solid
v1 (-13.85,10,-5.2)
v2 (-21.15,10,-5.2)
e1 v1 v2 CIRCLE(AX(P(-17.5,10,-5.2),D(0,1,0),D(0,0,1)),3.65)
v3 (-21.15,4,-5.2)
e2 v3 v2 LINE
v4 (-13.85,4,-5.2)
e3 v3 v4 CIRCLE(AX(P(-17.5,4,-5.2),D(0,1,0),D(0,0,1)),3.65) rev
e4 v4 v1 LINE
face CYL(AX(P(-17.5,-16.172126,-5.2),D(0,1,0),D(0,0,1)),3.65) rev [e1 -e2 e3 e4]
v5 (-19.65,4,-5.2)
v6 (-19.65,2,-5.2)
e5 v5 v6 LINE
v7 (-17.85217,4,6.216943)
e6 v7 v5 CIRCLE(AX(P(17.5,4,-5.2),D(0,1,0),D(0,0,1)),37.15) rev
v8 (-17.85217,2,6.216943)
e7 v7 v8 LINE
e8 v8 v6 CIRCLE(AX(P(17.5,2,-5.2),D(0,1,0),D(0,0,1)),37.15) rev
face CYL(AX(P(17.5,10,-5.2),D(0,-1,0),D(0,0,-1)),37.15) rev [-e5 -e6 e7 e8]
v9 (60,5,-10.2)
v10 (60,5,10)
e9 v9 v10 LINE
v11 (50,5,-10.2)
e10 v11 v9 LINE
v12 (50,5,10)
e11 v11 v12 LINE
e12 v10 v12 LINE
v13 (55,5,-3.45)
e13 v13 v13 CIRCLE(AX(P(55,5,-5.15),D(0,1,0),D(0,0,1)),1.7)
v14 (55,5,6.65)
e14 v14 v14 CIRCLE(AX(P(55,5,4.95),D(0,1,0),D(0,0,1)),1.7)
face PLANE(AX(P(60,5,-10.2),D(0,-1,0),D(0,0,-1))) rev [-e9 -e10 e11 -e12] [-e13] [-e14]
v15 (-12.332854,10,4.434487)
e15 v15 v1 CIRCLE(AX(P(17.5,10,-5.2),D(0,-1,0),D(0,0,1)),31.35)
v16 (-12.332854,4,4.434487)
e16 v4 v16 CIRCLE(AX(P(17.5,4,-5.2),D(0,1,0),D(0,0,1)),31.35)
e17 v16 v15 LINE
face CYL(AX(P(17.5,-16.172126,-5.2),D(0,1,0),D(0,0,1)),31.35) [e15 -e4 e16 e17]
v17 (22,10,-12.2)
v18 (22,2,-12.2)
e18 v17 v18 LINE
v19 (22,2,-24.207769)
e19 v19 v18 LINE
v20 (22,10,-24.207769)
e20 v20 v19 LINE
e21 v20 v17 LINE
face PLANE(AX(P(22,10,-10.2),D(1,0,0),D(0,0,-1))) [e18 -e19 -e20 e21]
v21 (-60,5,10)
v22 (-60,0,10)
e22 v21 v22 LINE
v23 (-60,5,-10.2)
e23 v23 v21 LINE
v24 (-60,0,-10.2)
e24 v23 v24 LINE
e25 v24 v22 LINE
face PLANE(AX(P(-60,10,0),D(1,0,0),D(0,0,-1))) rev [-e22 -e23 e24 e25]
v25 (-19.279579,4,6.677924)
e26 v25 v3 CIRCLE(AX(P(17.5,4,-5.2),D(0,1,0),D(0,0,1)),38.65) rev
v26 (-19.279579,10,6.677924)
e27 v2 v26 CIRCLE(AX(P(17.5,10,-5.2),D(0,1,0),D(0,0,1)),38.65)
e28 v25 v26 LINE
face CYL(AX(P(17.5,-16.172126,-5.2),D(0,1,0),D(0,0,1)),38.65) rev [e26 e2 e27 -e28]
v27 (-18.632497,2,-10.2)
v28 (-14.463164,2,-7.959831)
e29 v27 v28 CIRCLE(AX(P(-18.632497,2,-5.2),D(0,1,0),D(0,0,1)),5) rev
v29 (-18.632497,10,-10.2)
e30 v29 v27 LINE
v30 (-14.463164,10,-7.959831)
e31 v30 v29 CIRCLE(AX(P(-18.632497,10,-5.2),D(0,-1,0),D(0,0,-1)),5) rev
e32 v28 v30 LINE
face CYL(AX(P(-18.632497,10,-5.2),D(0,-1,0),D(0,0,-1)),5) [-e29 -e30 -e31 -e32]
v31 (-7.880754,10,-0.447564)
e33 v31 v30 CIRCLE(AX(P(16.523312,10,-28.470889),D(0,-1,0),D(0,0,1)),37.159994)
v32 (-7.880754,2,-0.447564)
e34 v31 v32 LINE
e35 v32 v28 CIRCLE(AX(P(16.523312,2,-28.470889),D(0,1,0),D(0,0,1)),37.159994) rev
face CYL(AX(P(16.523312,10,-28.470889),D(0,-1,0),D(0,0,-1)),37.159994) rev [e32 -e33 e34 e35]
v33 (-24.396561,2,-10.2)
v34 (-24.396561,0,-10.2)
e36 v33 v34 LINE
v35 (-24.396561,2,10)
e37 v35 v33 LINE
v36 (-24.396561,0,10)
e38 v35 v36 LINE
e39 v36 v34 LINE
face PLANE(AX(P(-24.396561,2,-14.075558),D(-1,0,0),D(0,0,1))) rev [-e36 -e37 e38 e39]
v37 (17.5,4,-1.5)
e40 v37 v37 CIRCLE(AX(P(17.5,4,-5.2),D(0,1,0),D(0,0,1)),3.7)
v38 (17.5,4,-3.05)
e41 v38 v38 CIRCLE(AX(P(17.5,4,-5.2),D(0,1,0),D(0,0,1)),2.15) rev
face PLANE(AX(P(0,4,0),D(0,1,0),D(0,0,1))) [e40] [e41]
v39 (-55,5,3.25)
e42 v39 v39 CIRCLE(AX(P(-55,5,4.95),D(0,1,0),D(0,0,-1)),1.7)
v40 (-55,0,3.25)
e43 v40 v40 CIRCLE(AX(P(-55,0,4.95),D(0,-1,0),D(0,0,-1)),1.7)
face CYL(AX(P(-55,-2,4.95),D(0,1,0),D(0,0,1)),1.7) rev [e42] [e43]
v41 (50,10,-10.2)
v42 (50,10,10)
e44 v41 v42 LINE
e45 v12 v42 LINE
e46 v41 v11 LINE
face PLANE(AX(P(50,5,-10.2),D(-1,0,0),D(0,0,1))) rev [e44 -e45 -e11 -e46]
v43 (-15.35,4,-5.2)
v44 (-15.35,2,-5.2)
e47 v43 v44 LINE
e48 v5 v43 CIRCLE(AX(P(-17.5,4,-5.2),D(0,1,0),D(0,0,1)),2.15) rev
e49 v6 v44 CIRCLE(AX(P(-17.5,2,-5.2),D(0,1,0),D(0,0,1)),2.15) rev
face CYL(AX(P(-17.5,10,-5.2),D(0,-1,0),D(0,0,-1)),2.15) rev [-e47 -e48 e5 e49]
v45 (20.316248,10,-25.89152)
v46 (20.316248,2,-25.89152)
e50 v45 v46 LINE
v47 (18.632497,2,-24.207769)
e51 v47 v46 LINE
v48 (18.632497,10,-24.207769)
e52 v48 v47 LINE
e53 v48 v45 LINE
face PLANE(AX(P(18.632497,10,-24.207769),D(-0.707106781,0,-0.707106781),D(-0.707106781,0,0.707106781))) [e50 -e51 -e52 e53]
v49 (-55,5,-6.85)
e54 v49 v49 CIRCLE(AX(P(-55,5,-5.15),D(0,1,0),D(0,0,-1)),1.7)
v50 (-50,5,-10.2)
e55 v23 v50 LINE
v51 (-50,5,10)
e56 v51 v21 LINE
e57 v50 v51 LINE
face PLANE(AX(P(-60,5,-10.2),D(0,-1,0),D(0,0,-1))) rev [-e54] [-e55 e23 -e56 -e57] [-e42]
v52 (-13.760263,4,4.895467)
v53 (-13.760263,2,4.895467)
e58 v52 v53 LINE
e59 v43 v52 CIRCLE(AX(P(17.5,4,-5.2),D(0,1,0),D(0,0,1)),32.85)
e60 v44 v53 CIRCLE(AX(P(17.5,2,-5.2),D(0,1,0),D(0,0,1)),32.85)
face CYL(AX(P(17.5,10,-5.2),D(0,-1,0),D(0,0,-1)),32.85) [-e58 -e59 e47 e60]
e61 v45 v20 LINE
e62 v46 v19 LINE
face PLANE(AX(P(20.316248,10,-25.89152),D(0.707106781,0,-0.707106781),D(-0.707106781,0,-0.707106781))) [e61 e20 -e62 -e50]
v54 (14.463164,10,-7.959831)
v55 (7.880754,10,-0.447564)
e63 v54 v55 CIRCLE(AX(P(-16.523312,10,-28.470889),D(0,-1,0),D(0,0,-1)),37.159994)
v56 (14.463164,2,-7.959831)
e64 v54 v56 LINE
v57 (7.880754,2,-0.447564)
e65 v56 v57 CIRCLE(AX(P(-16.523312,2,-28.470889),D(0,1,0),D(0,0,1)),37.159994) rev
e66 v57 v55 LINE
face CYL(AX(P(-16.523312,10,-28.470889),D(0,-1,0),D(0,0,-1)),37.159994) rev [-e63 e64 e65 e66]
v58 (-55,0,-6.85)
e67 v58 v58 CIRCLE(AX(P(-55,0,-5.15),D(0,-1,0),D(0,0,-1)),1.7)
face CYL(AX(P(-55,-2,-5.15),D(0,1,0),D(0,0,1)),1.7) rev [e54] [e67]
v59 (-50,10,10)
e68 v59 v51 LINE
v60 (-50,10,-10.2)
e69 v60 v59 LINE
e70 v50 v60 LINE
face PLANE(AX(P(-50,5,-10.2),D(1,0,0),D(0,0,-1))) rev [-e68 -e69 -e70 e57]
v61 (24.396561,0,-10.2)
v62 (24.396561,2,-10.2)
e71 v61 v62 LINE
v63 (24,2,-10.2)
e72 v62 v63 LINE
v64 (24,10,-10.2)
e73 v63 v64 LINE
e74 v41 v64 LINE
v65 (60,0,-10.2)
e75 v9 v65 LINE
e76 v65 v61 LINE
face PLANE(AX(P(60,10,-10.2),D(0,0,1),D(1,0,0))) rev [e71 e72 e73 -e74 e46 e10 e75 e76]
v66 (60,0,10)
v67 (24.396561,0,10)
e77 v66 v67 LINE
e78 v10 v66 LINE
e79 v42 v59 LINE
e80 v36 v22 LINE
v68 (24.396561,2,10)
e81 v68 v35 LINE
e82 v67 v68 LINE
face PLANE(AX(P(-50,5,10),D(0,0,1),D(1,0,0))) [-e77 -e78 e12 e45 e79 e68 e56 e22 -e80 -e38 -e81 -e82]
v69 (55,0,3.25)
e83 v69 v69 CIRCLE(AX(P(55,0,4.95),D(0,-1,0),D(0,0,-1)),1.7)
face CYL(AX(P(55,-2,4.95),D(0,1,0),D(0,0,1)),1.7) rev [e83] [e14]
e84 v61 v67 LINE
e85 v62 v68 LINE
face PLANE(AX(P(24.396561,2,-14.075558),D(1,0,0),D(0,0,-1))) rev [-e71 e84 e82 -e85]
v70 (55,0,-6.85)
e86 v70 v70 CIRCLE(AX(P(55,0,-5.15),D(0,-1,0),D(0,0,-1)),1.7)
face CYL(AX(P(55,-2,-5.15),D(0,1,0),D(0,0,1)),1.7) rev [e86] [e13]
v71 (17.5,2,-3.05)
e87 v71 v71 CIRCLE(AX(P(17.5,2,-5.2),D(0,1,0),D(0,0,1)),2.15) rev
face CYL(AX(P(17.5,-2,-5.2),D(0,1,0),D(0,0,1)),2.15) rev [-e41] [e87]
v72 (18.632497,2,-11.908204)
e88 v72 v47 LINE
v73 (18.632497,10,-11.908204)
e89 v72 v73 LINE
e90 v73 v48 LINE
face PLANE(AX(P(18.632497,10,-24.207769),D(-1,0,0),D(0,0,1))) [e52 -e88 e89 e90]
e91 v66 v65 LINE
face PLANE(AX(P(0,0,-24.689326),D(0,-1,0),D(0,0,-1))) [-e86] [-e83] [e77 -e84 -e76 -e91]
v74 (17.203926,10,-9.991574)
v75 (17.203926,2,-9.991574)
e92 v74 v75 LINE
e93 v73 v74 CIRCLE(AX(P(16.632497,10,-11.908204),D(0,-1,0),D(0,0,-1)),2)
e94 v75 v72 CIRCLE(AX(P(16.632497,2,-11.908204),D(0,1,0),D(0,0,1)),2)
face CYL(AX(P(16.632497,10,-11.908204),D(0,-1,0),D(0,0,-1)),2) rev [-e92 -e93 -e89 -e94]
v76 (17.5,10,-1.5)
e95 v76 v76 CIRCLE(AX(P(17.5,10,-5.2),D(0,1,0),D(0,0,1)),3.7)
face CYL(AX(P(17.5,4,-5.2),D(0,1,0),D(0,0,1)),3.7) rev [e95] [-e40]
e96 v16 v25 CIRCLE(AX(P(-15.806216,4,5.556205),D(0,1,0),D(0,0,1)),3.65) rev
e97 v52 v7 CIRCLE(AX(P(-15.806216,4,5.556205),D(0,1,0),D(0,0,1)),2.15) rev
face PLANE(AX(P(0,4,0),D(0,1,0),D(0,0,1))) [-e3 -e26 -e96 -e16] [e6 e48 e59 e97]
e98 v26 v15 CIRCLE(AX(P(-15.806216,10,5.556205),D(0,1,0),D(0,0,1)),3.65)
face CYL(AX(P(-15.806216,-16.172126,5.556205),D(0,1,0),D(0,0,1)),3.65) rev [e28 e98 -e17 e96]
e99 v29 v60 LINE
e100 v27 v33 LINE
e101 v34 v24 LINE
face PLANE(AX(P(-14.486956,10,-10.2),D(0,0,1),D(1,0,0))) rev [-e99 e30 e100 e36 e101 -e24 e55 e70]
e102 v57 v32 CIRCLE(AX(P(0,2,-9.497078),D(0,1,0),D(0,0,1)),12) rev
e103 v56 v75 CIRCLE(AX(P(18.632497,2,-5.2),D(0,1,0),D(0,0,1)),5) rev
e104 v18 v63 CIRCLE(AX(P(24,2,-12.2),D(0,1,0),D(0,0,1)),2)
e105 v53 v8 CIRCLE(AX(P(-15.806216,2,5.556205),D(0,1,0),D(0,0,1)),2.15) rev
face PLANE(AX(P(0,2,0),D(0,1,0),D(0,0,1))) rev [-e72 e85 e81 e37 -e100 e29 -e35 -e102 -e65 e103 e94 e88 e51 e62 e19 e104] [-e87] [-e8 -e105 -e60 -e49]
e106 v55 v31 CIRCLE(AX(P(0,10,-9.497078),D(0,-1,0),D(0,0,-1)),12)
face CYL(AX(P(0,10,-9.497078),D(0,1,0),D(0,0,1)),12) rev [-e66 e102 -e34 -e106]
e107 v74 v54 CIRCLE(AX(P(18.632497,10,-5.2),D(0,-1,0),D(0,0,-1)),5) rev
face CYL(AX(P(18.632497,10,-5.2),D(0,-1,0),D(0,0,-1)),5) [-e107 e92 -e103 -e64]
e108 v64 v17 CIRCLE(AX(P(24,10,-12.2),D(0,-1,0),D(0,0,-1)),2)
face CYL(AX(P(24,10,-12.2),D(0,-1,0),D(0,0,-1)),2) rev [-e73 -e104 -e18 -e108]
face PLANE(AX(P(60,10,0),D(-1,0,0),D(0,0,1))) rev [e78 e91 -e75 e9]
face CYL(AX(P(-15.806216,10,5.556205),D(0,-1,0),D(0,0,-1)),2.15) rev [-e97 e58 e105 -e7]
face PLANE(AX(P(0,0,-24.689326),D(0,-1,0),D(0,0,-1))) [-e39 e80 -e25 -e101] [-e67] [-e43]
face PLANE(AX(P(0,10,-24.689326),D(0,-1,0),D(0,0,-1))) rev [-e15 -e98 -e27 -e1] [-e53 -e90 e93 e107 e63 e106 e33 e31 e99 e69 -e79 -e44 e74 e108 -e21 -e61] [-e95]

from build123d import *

# Parameters (mm, degrees)
AUFSATZ_LINEAR_AUSTRAGEN1_DEPTH  = 10
AUFSATZ_LINEAR_START             = 2
AUFSATZ_LINEAR_AUSTRAGEN2_DEPTH  = 2
SKIZZE3_R                        = 2.15
SCHNITT_LINEAR_AUSTRAGEN1_DEPTH  = 63.032572089
SKIZZE5_R                        = 3.7
SKIZZE5_R_2                      = 2.15
SCHNITT_LINEAR_AUSTRAGEN3_DEPTH  = 6
VERRUNDUNG3_START                = -11
VERRUNDUNG3_DEPTH                = 12
VERRUNDUNG3_START_2              = -10.2
VERRUNDUNG3_2_DEPTH              = 10.2
SKIZZE9_W                        = 10
SKIZZE9_H                        = 5
SCHNITT_LINEAR_AUSTRAGEN6_DEPTH  = 62.676900052
SKIZZE10_W                       = 10
SKIZZE10_H                       = 10
AUFSATZ_LINEAR_AUSTRAGEN3_DEPTH  = 5
AUFSATZ_LINEAR_AUSTRAGEN4_DEPTH  = 10
SKIZZE12_R                       = 1.7
SCHNITT_LINEAR_AUSTRAGEN7_DEPTH  = 62.262060037
SCHNITT_LINEAR_AUSTRAGEN8_DEPTH  = 63.032572089
SCHNITT_LINEAR_AUSTRAGEN10_DEPTH = 63.032572089
VERRUNDUNG6_R                    = 5
VERRUNDUNG7_R                    = 12
SCHNITT_LINEAR_AUSTRAGEN11_DEPTH = 6
SKIZZE19_W                       = 48.79312263
SKIZZE19_H                       = 28.151116142
SCHNITT_LINEAR_AUSTRAGEN12_DEPTH = 4
AUFSATZ_LINEAR_AUSTRAGEN6_DEPTH  = 8
VERRUNDUNG8_R                    = 2


with BuildPart() as part:
    # Skizze1 → Aufsatz-Linear austragen1 (new body)
    with BuildSketch(Plane(origin=(0, 0, 0), x_dir=(1, 0, 0), z_dir=(0, 1, 0))):
        with BuildLine():
            Line((-60, 0), (60, 0))
            Line((60, 0), (60, 10.2))
            Line((60, 10.2), (14.486956443, 10.2))
            ThreePointArc((14.486956443, 10.2), (7.840151577, 5.759336515), (0, 4.2))
            ThreePointArc((0, 4.2), (-7.840151577, 5.759336515), (-14.486956443, 10.2))
            Line((-14.486956443, 10.2), (-60, 10.2))
            Line((-60, 10.2), (-60, 0))
        make_face()
    extrude(amount=AUFSATZ_LINEAR_AUSTRAGEN1_DEPTH)

    # Skizze7 → Aufsatz-Linear austragen2 (add)
    with BuildSketch(Plane.XZ.offset(AUFSATZ_LINEAR_START)):
        with BuildLine():
            Line((23, 0), (23, -10.2))
            Line((23, -10.2), (14.486956443, -10.2))
            ThreePointArc((14.486956443, -10.2), (0, -4.2), (-14.486956443, -10.2))
            Line((-14.486956443, -10.2), (-23, -10.2))
            Line((-23, -10.2), (-23, 0))
            Line((-23, 0), (23, 0))
        make_face()
    extrude(amount=-AUFSATZ_LINEAR_AUSTRAGEN2_DEPTH)

    # Skizze3 → Schnitt-Linear austragen1 (cut, through all)
    with BuildSketch(Plane(origin=(0, 10, 0), x_dir=(1, 0, 0), z_dir=(0, 1, 0))):
        with Locations(Location((17.5, 5.2, 0), (0, 0, 270))):
            Circle(SKIZZE3_R)
    extrude(amount=-SCHNITT_LINEAR_AUSTRAGEN1_DEPTH, mode=Mode.SUBTRACT)

    # Skizze5 → Schnitt-Linear austragen3 (cut)
    with BuildSketch(Plane(origin=(0, 10, 0), x_dir=(1, 0, 0), z_dir=(0, 1, 0))):
        with Locations(Location((17.5, 5.2, 0), (0, 0, 270))):
            Circle(SKIZZE5_R)
        with Locations(Location((17.5, 5.2, 0), (0, 0, 270))):
            Circle(SKIZZE5_R_2, mode=Mode.SUBTRACT)
    extrude(amount=-SCHNITT_LINEAR_AUSTRAGEN3_DEPTH, mode=Mode.SUBTRACT)

    # Verrundung3: read off the stored shape, not the designer's step
    # Verrundung3 outline → Verrundung3 (cut)
    with BuildSketch(Plane.XY.offset(VERRUNDUNG3_START)):
        with BuildLine():
            ThreePointArc((23, -1), (22.707106781, -1.707106781), (22, -2))
            Line((22, -2), (23, -2))
            Line((23, -2), (23, -1))
        make_face()
        with BuildLine():
            ThreePointArc((-22, -2), (-22.707106781, -1.707106781), (-23, -1))
            Line((-23, -1), (-23, -2))
            Line((-23, -2), (-22, -2))
        make_face()
    extrude(amount=VERRUNDUNG3_DEPTH, mode=Mode.SUBTRACT)

    # Verrundung3 2 outline → Verrundung3 2 (add)
    with BuildSketch(Plane.XY.offset(VERRUNDUNG3_START_2)):
        with BuildLine():
            Line((-23, 0), (-24, 0))
            ThreePointArc((-24, 0), (-23.292893219, -0.292893219), (-23, -1))
            Line((-23, -1), (-23, 0))
        make_face()
        with BuildLine():
            Line((23, 0), (23, -1))
            ThreePointArc((23, -1), (23.292893219, -0.292893219), (24, 0))
            Line((24, 0), (23, 0))
        make_face()
    extrude(amount=VERRUNDUNG3_2_DEPTH)

    # Skizze9 → Schnitt-Linear austragen6 (cut, through all)
    with BuildSketch(Plane.XY):
        with Locations((-55, 7.5)):
            Rectangle(SKIZZE9_W, SKIZZE9_H)
        with Locations((55, 7.5)):
            Rectangle(SKIZZE9_W, SKIZZE9_H)
    extrude(amount=-SCHNITT_LINEAR_AUSTRAGEN6_DEPTH, mode=Mode.SUBTRACT)

    # Skizze10 → Aufsatz-Linear austragen3 (add)
    with BuildSketch(Plane.XZ):
        with Locations((-55, 5)):
            Rectangle(SKIZZE10_W, SKIZZE10_H)
        with Locations((55, 5)):
            Rectangle(SKIZZE10_W, SKIZZE10_H)
    extrude(amount=-AUFSATZ_LINEAR_AUSTRAGEN3_DEPTH)

    # Skizze11 → Aufsatz-Linear austragen4 (add)
    with BuildSketch(Plane.XY):
        with BuildLine():
            Line((-50, 10), (-50, 0))
            Line((-50, 0), (-24, 0))
            ThreePointArc((-24, 0), (-23.292893219, -0.292893219), (-23, -1))
            ThreePointArc((-23, -1), (-22.707106781, -1.707106781), (-22, -2))
            Line((-22, -2), (22, -2))
            ThreePointArc((22, -2), (22.707106781, -1.707106781), (23, -1))
            ThreePointArc((23, -1), (23.292893219, -0.292893219), (24, 0))
            Line((24, 0), (50, 0))
            Line((50, 0), (50, 10))
            Line((50, 10), (-50, 10))
        make_face()
    extrude(amount=AUFSATZ_LINEAR_AUSTRAGEN4_DEPTH)

    # Skizze12 → Schnitt-Linear austragen7 (cut, through all)
    with BuildSketch(Plane(origin=(0, 5, 0), x_dir=(1, 0, 0), z_dir=(0, 1, 0))):
        with Locations(Location((55, 5.15, 0), (0, 0, 270))):
            Circle(SKIZZE12_R)
        with Locations(Location((55, -4.95, 0), (0, 0, 270))):
            Circle(SKIZZE12_R)
        with Locations(Location((-55, -4.95, 0), (0, 0, 90))):
            Circle(SKIZZE12_R)
        with Locations(Location((-55, 5.15, 0), (0, 0, 90))):
            Circle(SKIZZE12_R)
    extrude(amount=-SCHNITT_LINEAR_AUSTRAGEN7_DEPTH, mode=Mode.SUBTRACT)

    # Skizze14 → Schnitt-Linear austragen8 (cut, through all)
    with BuildSketch(Plane.XZ.offset(2)):
        with BuildLine():
            ThreePointArc((-17.852169734, 6.216943335), (-19.197790162, 0.578814515), (-19.65, -5.2))
            ThreePointArc((-19.65, -5.2), (-17.5, -7.35), (-15.35, -5.2))
            ThreePointArc((-15.35, -5.2), (-14.950132082, -0.090065766), (-13.760263143, 4.895466718))
            ThreePointArc((-13.760263143, 4.895466718), (-15.145478129, 7.602158322), (-17.852169734, 6.216943335))
        make_face()
    extrude(amount=-SCHNITT_LINEAR_AUSTRAGEN8_DEPTH, mode=Mode.SUBTRACT)

    # Skizze15 → Schnitt-Linear austragen10 (cut, through all)
    with BuildSketch(Plane.XZ.offset(2)):
        with BuildLine():
            Line((15.834683057, -10.2), (10.771946853, -14.532947046))
            Line((10.771946853, -14.532947046), (0, -16.110649456))
            Line((0, -16.110649456), (-10.771946853, -14.532947046))
            Line((-10.771946853, -14.532947046), (-15.834683057, -10.2))
            ThreePointArc((-15.834683057, -10.2), (-9.044172408, -1.504818286), (0, 4.813422401))
            ThreePointArc((0, 4.813422401), (9.044172408, -1.504818286), (15.834683057, -10.2))
        make_face()
    extrude(amount=-SCHNITT_LINEAR_AUSTRAGEN10_DEPTH, mode=Mode.SUBTRACT)

    # Verrundung6
    verrundung6_edges = [part.edges().sort_by_distance(p)[0] for p in [
        (15.834683057, 4, -10.2),
        (-15.834683057, 4, -10.2),
    ]]
    fillet(verrundung6_edges, radius=VERRUNDUNG6_R)

    # Verrundung7
    verrundung7_edges = [part.edges().sort_by_distance(p)[0] for p in [
        (0, 4, 4.813422401),
    ]]
    fillet(verrundung7_edges, radius=VERRUNDUNG7_R)

    # Skizze16 → Schnitt-Linear austragen11 (cut)
    with BuildSketch(Plane(origin=(0, 10, 0), x_dir=(1, 0, 0), z_dir=(0, 1, 0))):
        with BuildLine():
            ThreePointArc((-21.15, 5.2), (-20.679531353, -0.812144845), (-19.27957901, -6.677923551))
            ThreePointArc((-19.27957901, -6.677923551), (-14.684497914, -9.029567598), (-12.332853867, -4.434486502))
            ThreePointArc((-12.332853867, -4.434486502), (-13.468390891, 0.323396096), (-13.85, 5.2))
            ThreePointArc((-13.85, 5.2), (-17.5, 8.85), (-21.15, 5.2))
        make_face()
    extrude(amount=-SCHNITT_LINEAR_AUSTRAGEN11_DEPTH, mode=Mode.SUBTRACT)

    # Skizze19 → Schnitt-Linear austragen12 (cut)
    with BuildSketch(Plane.XZ.offset(2)):
        Rectangle(SKIZZE19_W, SKIZZE19_H)
    extrude(amount=-SCHNITT_LINEAR_AUSTRAGEN12_DEPTH, mode=Mode.SUBTRACT)

    # Skizze18 → Aufsatz-Linear austragen6 (add)
    with BuildSketch(Plane.XZ.offset(-2)):
        Polygon((22, -10.2), (22, -24.207768556), (20.316248486, -25.89152007), (18.632496972, -24.207768556), (18.632496972, -10.2), align=None)
    extrude(amount=-AUFSATZ_LINEAR_AUSTRAGEN6_DEPTH)

    # Verrundung8
    verrundung8_edges = [part.edges().sort_by_distance(p)[0] for p in [
        (18.632496972, 6, -10.2),
        (22, 6, -10.2),
    ]]
    fillet(verrundung8_edges, radius=VERRUNDUNG8_R)


solid = part.part
